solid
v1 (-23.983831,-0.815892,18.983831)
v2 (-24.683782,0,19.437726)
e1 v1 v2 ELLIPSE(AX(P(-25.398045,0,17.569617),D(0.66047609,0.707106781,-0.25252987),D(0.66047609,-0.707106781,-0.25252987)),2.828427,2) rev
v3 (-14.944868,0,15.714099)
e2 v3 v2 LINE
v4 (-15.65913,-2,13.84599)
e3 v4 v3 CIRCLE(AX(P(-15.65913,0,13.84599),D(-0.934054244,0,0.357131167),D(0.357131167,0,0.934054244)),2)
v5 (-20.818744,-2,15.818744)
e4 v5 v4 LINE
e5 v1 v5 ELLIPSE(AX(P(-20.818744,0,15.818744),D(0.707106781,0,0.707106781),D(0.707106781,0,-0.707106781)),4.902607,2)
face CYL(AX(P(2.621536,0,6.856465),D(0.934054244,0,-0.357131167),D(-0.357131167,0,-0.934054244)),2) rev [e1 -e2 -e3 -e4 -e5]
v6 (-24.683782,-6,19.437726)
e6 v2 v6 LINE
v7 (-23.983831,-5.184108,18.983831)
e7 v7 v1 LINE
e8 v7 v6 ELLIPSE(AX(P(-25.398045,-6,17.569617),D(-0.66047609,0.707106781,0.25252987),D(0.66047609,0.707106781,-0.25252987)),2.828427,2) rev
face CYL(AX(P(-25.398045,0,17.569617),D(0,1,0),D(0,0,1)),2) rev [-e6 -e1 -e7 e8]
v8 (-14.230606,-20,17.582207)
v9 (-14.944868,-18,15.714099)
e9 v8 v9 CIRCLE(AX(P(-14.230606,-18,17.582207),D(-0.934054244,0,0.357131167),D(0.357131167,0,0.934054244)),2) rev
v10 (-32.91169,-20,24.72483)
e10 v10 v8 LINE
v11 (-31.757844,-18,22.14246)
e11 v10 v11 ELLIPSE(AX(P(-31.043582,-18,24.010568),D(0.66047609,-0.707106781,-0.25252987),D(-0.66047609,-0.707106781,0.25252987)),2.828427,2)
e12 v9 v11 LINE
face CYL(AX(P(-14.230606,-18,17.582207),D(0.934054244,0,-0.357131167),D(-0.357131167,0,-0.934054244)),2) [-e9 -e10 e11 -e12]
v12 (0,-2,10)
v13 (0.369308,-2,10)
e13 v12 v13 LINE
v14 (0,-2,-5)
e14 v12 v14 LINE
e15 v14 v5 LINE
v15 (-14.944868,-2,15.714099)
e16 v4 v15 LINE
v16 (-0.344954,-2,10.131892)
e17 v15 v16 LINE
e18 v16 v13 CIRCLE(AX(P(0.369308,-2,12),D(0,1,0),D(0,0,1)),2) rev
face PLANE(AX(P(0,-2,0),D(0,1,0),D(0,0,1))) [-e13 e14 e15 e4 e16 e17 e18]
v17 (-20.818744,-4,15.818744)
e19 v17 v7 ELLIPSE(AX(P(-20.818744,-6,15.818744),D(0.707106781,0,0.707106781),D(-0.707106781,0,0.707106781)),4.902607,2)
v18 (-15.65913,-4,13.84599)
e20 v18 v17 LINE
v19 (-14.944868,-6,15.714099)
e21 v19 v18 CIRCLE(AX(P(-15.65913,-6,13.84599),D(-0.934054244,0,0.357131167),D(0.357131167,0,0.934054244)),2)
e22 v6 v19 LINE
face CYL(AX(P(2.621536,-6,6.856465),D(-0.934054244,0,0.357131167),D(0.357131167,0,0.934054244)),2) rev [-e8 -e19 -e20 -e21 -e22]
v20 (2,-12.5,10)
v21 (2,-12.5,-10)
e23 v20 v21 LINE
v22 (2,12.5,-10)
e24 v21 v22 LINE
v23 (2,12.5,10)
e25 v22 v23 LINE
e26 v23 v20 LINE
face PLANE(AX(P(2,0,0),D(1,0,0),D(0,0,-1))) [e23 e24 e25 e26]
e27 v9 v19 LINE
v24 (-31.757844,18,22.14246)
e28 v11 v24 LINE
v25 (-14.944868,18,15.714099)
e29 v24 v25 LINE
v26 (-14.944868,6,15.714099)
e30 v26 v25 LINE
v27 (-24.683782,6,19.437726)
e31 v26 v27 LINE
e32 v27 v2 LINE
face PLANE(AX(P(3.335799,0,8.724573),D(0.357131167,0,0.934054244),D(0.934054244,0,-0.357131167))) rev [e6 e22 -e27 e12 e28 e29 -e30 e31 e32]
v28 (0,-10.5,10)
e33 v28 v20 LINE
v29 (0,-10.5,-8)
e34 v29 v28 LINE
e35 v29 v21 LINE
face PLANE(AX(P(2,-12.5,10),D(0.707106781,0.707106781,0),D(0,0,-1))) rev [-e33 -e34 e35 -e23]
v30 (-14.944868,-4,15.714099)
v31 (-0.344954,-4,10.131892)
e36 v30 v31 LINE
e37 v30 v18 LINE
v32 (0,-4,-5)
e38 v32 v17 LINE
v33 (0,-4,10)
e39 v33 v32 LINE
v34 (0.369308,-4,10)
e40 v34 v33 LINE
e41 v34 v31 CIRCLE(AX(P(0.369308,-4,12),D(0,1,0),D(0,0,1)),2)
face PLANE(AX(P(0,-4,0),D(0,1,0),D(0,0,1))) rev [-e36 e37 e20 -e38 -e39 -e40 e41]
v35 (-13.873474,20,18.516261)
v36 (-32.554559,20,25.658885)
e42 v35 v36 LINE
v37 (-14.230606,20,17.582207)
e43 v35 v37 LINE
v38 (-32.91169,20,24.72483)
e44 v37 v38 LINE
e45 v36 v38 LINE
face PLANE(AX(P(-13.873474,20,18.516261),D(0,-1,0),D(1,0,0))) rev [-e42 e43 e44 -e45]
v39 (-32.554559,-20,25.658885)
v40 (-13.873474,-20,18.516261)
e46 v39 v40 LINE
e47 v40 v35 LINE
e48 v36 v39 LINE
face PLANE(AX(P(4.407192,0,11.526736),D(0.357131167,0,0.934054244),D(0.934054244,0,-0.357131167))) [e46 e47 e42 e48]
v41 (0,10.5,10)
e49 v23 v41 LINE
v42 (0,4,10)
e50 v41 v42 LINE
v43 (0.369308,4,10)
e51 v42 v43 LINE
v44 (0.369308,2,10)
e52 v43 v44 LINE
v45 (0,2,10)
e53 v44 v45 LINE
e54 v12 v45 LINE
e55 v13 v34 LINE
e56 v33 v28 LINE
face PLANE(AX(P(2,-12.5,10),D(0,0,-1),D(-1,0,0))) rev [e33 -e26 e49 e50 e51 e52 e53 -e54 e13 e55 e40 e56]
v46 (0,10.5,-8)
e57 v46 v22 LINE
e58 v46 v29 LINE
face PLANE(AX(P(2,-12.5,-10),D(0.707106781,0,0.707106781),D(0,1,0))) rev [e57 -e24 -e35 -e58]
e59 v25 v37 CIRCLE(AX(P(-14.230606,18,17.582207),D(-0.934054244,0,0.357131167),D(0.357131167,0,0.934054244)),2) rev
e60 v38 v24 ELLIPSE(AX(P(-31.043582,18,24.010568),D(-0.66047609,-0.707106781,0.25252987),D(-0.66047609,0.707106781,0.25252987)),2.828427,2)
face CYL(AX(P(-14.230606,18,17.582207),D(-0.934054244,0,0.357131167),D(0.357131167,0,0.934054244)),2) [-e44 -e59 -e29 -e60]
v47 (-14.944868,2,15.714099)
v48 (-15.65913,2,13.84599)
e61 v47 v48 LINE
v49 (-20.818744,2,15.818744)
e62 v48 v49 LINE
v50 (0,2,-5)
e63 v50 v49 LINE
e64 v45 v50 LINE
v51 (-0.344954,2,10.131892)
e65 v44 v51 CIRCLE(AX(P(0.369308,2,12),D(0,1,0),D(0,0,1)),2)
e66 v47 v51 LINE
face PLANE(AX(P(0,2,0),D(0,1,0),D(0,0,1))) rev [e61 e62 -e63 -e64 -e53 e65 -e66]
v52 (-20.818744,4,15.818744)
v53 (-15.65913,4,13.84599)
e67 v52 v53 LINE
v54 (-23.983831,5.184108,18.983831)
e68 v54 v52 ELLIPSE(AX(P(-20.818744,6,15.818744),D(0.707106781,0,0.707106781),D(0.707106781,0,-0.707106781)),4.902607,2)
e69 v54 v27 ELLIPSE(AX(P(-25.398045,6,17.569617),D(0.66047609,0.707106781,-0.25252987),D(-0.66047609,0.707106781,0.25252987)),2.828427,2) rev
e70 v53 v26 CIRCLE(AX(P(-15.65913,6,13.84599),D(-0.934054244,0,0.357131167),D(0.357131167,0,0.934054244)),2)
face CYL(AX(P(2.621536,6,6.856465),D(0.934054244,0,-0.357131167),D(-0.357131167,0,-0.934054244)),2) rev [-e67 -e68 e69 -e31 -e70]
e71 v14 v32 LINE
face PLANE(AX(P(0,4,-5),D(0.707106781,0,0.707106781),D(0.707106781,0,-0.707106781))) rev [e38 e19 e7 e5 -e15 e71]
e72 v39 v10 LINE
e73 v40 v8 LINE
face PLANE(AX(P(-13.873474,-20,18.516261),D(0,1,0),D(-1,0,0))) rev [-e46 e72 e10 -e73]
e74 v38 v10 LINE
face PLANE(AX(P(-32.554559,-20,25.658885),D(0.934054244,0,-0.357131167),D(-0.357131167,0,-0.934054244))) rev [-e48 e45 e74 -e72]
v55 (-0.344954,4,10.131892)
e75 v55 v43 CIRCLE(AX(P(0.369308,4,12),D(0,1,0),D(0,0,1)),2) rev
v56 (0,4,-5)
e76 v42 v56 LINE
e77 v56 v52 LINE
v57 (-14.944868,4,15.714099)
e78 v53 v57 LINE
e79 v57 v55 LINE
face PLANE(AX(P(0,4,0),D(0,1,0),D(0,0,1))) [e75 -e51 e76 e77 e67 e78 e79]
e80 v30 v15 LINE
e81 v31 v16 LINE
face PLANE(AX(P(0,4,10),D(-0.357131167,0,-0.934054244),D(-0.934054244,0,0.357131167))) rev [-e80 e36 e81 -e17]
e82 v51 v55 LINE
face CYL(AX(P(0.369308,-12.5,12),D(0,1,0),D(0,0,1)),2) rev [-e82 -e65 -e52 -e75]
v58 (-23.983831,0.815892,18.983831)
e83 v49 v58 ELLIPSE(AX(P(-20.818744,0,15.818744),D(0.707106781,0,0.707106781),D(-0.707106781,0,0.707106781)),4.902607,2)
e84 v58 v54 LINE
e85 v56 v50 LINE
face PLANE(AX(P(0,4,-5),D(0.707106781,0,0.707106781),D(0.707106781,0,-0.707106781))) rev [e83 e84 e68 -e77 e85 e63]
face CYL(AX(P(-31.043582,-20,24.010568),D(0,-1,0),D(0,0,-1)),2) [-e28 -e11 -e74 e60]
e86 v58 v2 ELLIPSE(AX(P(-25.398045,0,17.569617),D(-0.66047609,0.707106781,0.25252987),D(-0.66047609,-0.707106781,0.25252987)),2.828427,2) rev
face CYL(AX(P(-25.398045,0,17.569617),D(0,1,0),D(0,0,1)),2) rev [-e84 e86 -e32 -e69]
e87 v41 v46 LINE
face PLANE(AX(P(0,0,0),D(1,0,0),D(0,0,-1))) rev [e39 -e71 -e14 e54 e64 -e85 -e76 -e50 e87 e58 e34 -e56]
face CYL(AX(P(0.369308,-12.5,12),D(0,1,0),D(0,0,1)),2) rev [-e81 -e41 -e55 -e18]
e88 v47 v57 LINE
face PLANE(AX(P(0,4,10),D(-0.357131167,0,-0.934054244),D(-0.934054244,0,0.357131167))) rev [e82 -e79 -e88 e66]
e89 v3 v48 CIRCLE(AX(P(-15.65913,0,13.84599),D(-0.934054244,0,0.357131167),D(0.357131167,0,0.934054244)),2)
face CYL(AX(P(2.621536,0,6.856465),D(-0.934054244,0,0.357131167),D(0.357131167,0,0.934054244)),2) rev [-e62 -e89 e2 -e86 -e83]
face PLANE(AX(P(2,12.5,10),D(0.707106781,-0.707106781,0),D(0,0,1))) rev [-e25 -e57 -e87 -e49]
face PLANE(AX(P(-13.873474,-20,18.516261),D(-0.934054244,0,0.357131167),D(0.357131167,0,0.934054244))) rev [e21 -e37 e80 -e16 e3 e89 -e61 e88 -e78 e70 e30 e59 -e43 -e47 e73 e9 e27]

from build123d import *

# Parameters (mm, degrees)
SKETCH1_W           = 25
SKETCH1_H           = 20
BOSS_EXTRUDE1_DEPTH = 2
BOSS_EXTRUDE2_DEPTH = 4
CUT_EXTRUDE1_DEPTH  = 2
SKETCH5_W           = 20
SKETCH5_H           = 40
BOSS_EXTRUDE5_DEPTH = 3
FILLET3_R           = 2
CHAMFER1_SIZE       = 2
FILLET4_R           = 2


with BuildPart() as part:
    # Sketch1 → Boss-Extrude1 (new body)
    with BuildSketch(Plane.YZ):
        Rectangle(SKETCH1_W, SKETCH1_H)
    extrude(amount=BOSS_EXTRUDE1_DEPTH)

    # Sketch2 → Boss-Extrude2 (add, symmetric)
    with BuildSketch(Plane(origin=(0, 0, 0), x_dir=(-1, 0, 0), z_dir=(0, 1, 0))):
        Polygon((0, -5), (24.285410332, 19.285410332), (0, 10), align=None)
    extrude(amount=BOSS_EXTRUDE2_DEPTH, both=True)

    # Sketch2<2> → Cut-Extrude1 (cut, symmetric)
    with BuildSketch(Plane(origin=(0, 0, 0), x_dir=(-1, 0, 0), z_dir=(0, 1, 0))):
        Polygon((0, -5), (24.285410332, 19.285410332), (0, 10), align=None)
    extrude(amount=CUT_EXTRUDE1_DEPTH, both=True, mode=Mode.SUBTRACT)

    # Sketch5 → Boss-Extrude5 (add)
    with BuildSketch(Plane(origin=(3.335798817, 0, 8.724573298), x_dir=(0.9340542435228668, 0, -0.3571311665997872), z_dir=(0.3571311665997872, 0, 0.9340542435228668))):
        with Locations((-29.571311666, 0)):
            Rectangle(SKETCH5_W, SKETCH5_H)
    extrude(amount=BOSS_EXTRUDE5_DEPTH)

    # Fillet3
    fillet3_edges = [part.edges().sort_by_distance(p)[0] for p in [
        (-19.615139114, -4, 17.499754499),
        (-24.285410332, 3, 19.285410332),
        (-19.615139114, 4, 17.499754499),
        (-24.285410332, -3, 19.285410332),
        (-19.615139114, -2, 17.499754499),
        (-19.615139114, 2, 17.499754499),
        (-33.625952767, 0, 22.856721998),
        (-24.285410332, -20, 19.285410332),
        (-24.285410332, 20, 19.285410332),
    ]]
    fillet(fillet3_edges, radius=FILLET3_R - 0.0001)  # a hair under: the kernel refuses the full size

    # Chamfer1
    chamfer1_edges = [part.edges().sort_by_distance(p)[0] for p in [
        (0, -12.5, 0),
        (0, 0, -10),
        (0, 12.5, 0),
    ]]
    chamfer(chamfer1_edges, length=CHAMFER1_SIZE - 0.0001)  # a hair under: the kernel refuses the full size

    # Fillet4
    fillet4_edges = [part.edges().sort_by_distance(p)[0] for p in [
        (0, 3, 10),
        (0, -3, 10),
    ]]
    fillet(fillet4_edges, radius=FILLET4_R)


solid = part.part
